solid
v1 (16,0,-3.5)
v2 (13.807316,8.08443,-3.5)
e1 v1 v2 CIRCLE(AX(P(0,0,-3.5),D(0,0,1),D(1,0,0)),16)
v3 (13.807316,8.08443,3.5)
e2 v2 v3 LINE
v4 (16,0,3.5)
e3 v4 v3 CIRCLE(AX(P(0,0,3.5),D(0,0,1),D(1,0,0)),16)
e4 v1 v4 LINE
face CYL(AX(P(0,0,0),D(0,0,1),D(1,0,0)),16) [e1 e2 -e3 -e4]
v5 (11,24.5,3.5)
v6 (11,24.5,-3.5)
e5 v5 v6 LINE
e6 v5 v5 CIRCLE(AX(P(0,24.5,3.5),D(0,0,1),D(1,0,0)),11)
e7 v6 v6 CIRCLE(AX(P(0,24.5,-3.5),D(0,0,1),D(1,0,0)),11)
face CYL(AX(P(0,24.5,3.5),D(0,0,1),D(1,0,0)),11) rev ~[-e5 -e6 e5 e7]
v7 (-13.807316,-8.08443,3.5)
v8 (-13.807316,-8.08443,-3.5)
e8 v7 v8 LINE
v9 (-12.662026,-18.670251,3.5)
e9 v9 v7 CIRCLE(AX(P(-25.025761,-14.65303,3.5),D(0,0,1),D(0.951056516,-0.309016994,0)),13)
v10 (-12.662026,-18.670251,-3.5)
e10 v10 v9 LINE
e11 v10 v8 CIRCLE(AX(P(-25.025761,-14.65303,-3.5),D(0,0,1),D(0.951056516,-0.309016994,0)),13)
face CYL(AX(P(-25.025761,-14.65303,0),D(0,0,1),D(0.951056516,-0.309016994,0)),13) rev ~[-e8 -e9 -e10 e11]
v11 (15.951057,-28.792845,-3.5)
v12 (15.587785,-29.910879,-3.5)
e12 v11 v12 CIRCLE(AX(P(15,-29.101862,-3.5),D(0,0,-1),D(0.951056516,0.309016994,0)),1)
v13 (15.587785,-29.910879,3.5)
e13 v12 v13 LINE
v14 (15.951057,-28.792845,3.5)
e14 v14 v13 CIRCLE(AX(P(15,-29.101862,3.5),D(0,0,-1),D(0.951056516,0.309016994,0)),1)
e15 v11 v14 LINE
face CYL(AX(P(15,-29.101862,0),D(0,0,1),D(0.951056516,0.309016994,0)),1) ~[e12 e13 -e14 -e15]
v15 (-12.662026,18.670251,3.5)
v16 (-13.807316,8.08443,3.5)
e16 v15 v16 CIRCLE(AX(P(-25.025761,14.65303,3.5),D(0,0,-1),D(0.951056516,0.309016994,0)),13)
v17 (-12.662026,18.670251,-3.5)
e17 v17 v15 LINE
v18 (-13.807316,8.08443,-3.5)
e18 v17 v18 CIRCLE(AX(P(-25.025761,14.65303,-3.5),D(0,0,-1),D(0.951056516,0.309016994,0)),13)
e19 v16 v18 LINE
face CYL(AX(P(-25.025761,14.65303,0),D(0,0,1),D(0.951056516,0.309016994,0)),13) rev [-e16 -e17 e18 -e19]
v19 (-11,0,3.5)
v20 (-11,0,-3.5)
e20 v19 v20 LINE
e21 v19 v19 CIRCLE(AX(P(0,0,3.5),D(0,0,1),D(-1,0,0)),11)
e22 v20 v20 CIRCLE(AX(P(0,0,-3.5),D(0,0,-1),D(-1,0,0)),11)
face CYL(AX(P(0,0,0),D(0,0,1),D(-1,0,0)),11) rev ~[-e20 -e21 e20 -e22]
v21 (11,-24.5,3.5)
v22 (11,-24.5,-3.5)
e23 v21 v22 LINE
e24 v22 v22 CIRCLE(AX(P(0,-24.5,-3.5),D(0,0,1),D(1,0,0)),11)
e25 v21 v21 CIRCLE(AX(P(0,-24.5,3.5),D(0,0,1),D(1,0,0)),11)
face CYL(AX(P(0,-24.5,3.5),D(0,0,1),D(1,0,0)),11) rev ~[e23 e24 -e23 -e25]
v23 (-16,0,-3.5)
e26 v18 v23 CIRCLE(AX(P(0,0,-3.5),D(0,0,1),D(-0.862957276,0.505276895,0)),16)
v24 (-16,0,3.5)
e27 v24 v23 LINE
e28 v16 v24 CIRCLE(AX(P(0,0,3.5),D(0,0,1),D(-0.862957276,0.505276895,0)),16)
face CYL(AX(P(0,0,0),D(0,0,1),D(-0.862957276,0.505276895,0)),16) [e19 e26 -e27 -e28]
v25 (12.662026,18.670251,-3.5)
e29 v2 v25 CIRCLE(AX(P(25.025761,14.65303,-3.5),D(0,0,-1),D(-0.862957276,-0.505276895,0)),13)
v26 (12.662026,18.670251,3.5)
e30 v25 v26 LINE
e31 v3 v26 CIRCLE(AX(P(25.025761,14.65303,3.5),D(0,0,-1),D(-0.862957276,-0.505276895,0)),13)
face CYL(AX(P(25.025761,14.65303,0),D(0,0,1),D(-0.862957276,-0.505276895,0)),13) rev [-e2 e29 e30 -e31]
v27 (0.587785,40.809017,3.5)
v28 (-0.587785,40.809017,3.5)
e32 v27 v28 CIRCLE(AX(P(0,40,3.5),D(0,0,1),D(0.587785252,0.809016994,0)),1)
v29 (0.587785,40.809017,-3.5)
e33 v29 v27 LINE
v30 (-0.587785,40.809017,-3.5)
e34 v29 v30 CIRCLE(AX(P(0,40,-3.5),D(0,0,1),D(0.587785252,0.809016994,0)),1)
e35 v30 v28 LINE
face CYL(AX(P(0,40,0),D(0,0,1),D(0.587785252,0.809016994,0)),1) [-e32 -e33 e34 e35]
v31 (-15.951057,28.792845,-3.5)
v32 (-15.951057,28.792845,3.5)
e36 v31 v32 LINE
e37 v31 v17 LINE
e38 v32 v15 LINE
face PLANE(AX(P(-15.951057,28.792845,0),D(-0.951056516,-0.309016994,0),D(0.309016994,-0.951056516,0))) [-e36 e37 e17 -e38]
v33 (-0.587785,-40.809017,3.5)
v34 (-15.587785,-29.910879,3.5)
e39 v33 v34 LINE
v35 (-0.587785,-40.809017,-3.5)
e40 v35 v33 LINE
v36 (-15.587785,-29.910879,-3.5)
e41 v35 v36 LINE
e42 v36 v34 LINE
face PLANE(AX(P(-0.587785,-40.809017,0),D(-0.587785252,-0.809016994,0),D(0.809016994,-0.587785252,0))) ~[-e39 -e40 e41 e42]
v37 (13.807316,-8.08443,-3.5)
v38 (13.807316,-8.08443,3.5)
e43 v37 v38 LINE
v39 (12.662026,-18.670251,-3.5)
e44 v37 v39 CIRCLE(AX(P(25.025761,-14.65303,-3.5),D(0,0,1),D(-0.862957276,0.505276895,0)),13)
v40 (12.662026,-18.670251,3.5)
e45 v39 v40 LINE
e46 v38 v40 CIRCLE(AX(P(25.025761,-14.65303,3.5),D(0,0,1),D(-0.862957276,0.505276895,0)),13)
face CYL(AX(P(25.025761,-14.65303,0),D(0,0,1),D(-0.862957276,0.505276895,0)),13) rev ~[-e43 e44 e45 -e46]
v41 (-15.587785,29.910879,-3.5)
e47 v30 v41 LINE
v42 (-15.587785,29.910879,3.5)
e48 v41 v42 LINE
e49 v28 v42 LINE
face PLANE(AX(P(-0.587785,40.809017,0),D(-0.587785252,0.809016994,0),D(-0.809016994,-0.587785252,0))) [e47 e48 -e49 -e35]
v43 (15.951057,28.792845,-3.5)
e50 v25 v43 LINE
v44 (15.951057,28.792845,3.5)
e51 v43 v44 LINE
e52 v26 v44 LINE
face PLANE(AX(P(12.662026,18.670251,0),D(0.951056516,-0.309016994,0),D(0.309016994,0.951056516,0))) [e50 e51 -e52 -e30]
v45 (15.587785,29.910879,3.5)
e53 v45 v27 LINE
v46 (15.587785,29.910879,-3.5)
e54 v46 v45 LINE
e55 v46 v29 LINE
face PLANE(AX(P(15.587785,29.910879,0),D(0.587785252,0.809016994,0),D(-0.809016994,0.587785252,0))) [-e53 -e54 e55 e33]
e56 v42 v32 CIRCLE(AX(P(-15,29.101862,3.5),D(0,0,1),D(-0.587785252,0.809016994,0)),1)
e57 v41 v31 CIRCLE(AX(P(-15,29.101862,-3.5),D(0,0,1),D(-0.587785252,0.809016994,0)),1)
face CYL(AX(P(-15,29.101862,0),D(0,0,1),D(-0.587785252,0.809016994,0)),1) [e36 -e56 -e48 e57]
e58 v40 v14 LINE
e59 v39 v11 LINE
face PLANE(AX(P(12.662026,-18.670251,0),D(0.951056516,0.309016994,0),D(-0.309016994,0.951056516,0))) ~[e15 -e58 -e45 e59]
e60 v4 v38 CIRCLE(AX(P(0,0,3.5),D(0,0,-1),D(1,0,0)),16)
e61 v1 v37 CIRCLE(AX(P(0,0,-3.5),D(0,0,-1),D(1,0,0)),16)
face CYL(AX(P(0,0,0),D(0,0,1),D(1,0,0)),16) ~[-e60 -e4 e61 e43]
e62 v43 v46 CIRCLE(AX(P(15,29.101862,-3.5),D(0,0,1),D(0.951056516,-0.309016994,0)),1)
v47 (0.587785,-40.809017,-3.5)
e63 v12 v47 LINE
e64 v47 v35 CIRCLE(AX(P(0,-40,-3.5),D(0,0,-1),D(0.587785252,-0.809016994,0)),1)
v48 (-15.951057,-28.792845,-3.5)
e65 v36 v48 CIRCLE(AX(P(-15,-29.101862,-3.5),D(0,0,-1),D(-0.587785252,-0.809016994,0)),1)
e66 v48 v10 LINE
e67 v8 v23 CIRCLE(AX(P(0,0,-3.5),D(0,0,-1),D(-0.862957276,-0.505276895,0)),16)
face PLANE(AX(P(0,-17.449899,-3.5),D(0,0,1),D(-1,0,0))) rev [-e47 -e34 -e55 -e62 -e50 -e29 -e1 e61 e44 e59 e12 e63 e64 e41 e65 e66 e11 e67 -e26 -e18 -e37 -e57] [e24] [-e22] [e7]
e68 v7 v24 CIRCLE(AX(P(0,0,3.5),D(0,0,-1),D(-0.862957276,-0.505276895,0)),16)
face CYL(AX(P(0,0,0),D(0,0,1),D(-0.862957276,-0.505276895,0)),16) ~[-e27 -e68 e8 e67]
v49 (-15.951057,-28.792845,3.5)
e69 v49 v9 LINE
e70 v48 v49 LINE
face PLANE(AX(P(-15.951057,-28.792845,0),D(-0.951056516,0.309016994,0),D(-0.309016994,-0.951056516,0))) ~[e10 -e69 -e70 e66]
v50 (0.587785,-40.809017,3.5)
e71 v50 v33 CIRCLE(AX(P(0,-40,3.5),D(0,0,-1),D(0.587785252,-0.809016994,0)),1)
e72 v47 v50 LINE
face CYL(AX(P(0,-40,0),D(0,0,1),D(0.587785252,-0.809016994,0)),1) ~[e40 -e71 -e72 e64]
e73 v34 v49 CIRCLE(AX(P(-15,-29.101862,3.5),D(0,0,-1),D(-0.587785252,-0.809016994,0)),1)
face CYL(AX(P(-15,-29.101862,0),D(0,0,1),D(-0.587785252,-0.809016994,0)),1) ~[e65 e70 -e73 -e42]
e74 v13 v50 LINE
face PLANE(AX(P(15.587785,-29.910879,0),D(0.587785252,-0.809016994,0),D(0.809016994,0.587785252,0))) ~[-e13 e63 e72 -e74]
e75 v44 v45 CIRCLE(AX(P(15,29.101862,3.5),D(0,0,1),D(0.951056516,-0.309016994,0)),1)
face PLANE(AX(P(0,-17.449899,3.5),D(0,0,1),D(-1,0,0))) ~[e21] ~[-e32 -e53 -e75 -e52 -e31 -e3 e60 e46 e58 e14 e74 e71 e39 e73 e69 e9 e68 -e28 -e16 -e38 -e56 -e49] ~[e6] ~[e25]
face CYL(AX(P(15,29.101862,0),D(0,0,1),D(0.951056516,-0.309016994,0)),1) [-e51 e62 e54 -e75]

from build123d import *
from build123d import SkipClean  # not in build123d's __all__

# Parameters (mm, degrees)
F1_DEPTH = 3.5
F3_R     = 11
F4_DEPTH = 7.001


with BuildPart() as f1:
    # F0 (on Top) → F1 (new body, symmetric)
    with BuildSketch(Plane.XY):
        with BuildLine():
            ThreePointArc((-11, 0), (0, 11), (11, 0))
            Line((11, 0), (16, 0))
            ThreePointArc((16, 0), (15.4421025537, 4.1882536601), (13.8073164099, 8.0844303175))
            ThreePointArc((13.8073164099, 8.0844303175), (12.1011838507, 13.2547074929), (12.6620262811, 18.6702508773))
            Line((12.6620262811, 18.6702508773), (15.9510565163, 28.7928450855))
            ThreePointArc((15.9510565163, 28.7928450855), (15.9510565163, 29.4108790743), (15.5877852523, 29.9108790743))
            Line((15.5877852523, 29.9108790743), (0.5877852523, 40.8090169944))
            ThreePointArc((0.5877852523, 40.8090169944), (0, 41), (-0.5877852523, 40.8090169944))
            Line((-0.5877852523, 40.8090169944), (-15.5877852523, 29.9108790743))
            ThreePointArc((-15.5877852523, 29.9108790743), (-15.9510565163, 29.4108790743), (-15.9510565163, 28.7928450855))
            Line((-15.9510565163, 28.7928450855), (-12.6620262811, 18.6702508773))
            ThreePointArc((-12.6620262811, 18.6702508773), (-12.1011838507, 13.2547074929), (-13.8073164099, 8.0844303175))
            ThreePointArc((-13.8073164099, 8.0844303175), (-15.4421025537, 4.1882536601), (-16, 0))
            Line((-16, 0), (-11, 0))
        make_face()
    extrude(amount=F1_DEPTH, both=True)

    # F2: F1 across face


with BuildPart() as f1_1:
    add(f1.part, clean=False)
    with SkipClean():  # cleaning this boolean's faces spoils the solid; the shape is the same uncleaned
        add(f1.part.mirror(Plane(origin=(-13.5, 0, 0), x_dir=(1, 0, 0), z_dir=(0, -1, 0))), clean=False)

    # F3 (on face) → F4 (cut, through all)
    with BuildSketch(Plane.XY.offset(3.5)):
        with Locations((0, 24.5)):
            Circle(F3_R)
        with Locations((0, -24.5)):
            Circle(F3_R)
    extrude(amount=-F4_DEPTH, mode=Mode.SUBTRACT)


solid = f1_1.part
